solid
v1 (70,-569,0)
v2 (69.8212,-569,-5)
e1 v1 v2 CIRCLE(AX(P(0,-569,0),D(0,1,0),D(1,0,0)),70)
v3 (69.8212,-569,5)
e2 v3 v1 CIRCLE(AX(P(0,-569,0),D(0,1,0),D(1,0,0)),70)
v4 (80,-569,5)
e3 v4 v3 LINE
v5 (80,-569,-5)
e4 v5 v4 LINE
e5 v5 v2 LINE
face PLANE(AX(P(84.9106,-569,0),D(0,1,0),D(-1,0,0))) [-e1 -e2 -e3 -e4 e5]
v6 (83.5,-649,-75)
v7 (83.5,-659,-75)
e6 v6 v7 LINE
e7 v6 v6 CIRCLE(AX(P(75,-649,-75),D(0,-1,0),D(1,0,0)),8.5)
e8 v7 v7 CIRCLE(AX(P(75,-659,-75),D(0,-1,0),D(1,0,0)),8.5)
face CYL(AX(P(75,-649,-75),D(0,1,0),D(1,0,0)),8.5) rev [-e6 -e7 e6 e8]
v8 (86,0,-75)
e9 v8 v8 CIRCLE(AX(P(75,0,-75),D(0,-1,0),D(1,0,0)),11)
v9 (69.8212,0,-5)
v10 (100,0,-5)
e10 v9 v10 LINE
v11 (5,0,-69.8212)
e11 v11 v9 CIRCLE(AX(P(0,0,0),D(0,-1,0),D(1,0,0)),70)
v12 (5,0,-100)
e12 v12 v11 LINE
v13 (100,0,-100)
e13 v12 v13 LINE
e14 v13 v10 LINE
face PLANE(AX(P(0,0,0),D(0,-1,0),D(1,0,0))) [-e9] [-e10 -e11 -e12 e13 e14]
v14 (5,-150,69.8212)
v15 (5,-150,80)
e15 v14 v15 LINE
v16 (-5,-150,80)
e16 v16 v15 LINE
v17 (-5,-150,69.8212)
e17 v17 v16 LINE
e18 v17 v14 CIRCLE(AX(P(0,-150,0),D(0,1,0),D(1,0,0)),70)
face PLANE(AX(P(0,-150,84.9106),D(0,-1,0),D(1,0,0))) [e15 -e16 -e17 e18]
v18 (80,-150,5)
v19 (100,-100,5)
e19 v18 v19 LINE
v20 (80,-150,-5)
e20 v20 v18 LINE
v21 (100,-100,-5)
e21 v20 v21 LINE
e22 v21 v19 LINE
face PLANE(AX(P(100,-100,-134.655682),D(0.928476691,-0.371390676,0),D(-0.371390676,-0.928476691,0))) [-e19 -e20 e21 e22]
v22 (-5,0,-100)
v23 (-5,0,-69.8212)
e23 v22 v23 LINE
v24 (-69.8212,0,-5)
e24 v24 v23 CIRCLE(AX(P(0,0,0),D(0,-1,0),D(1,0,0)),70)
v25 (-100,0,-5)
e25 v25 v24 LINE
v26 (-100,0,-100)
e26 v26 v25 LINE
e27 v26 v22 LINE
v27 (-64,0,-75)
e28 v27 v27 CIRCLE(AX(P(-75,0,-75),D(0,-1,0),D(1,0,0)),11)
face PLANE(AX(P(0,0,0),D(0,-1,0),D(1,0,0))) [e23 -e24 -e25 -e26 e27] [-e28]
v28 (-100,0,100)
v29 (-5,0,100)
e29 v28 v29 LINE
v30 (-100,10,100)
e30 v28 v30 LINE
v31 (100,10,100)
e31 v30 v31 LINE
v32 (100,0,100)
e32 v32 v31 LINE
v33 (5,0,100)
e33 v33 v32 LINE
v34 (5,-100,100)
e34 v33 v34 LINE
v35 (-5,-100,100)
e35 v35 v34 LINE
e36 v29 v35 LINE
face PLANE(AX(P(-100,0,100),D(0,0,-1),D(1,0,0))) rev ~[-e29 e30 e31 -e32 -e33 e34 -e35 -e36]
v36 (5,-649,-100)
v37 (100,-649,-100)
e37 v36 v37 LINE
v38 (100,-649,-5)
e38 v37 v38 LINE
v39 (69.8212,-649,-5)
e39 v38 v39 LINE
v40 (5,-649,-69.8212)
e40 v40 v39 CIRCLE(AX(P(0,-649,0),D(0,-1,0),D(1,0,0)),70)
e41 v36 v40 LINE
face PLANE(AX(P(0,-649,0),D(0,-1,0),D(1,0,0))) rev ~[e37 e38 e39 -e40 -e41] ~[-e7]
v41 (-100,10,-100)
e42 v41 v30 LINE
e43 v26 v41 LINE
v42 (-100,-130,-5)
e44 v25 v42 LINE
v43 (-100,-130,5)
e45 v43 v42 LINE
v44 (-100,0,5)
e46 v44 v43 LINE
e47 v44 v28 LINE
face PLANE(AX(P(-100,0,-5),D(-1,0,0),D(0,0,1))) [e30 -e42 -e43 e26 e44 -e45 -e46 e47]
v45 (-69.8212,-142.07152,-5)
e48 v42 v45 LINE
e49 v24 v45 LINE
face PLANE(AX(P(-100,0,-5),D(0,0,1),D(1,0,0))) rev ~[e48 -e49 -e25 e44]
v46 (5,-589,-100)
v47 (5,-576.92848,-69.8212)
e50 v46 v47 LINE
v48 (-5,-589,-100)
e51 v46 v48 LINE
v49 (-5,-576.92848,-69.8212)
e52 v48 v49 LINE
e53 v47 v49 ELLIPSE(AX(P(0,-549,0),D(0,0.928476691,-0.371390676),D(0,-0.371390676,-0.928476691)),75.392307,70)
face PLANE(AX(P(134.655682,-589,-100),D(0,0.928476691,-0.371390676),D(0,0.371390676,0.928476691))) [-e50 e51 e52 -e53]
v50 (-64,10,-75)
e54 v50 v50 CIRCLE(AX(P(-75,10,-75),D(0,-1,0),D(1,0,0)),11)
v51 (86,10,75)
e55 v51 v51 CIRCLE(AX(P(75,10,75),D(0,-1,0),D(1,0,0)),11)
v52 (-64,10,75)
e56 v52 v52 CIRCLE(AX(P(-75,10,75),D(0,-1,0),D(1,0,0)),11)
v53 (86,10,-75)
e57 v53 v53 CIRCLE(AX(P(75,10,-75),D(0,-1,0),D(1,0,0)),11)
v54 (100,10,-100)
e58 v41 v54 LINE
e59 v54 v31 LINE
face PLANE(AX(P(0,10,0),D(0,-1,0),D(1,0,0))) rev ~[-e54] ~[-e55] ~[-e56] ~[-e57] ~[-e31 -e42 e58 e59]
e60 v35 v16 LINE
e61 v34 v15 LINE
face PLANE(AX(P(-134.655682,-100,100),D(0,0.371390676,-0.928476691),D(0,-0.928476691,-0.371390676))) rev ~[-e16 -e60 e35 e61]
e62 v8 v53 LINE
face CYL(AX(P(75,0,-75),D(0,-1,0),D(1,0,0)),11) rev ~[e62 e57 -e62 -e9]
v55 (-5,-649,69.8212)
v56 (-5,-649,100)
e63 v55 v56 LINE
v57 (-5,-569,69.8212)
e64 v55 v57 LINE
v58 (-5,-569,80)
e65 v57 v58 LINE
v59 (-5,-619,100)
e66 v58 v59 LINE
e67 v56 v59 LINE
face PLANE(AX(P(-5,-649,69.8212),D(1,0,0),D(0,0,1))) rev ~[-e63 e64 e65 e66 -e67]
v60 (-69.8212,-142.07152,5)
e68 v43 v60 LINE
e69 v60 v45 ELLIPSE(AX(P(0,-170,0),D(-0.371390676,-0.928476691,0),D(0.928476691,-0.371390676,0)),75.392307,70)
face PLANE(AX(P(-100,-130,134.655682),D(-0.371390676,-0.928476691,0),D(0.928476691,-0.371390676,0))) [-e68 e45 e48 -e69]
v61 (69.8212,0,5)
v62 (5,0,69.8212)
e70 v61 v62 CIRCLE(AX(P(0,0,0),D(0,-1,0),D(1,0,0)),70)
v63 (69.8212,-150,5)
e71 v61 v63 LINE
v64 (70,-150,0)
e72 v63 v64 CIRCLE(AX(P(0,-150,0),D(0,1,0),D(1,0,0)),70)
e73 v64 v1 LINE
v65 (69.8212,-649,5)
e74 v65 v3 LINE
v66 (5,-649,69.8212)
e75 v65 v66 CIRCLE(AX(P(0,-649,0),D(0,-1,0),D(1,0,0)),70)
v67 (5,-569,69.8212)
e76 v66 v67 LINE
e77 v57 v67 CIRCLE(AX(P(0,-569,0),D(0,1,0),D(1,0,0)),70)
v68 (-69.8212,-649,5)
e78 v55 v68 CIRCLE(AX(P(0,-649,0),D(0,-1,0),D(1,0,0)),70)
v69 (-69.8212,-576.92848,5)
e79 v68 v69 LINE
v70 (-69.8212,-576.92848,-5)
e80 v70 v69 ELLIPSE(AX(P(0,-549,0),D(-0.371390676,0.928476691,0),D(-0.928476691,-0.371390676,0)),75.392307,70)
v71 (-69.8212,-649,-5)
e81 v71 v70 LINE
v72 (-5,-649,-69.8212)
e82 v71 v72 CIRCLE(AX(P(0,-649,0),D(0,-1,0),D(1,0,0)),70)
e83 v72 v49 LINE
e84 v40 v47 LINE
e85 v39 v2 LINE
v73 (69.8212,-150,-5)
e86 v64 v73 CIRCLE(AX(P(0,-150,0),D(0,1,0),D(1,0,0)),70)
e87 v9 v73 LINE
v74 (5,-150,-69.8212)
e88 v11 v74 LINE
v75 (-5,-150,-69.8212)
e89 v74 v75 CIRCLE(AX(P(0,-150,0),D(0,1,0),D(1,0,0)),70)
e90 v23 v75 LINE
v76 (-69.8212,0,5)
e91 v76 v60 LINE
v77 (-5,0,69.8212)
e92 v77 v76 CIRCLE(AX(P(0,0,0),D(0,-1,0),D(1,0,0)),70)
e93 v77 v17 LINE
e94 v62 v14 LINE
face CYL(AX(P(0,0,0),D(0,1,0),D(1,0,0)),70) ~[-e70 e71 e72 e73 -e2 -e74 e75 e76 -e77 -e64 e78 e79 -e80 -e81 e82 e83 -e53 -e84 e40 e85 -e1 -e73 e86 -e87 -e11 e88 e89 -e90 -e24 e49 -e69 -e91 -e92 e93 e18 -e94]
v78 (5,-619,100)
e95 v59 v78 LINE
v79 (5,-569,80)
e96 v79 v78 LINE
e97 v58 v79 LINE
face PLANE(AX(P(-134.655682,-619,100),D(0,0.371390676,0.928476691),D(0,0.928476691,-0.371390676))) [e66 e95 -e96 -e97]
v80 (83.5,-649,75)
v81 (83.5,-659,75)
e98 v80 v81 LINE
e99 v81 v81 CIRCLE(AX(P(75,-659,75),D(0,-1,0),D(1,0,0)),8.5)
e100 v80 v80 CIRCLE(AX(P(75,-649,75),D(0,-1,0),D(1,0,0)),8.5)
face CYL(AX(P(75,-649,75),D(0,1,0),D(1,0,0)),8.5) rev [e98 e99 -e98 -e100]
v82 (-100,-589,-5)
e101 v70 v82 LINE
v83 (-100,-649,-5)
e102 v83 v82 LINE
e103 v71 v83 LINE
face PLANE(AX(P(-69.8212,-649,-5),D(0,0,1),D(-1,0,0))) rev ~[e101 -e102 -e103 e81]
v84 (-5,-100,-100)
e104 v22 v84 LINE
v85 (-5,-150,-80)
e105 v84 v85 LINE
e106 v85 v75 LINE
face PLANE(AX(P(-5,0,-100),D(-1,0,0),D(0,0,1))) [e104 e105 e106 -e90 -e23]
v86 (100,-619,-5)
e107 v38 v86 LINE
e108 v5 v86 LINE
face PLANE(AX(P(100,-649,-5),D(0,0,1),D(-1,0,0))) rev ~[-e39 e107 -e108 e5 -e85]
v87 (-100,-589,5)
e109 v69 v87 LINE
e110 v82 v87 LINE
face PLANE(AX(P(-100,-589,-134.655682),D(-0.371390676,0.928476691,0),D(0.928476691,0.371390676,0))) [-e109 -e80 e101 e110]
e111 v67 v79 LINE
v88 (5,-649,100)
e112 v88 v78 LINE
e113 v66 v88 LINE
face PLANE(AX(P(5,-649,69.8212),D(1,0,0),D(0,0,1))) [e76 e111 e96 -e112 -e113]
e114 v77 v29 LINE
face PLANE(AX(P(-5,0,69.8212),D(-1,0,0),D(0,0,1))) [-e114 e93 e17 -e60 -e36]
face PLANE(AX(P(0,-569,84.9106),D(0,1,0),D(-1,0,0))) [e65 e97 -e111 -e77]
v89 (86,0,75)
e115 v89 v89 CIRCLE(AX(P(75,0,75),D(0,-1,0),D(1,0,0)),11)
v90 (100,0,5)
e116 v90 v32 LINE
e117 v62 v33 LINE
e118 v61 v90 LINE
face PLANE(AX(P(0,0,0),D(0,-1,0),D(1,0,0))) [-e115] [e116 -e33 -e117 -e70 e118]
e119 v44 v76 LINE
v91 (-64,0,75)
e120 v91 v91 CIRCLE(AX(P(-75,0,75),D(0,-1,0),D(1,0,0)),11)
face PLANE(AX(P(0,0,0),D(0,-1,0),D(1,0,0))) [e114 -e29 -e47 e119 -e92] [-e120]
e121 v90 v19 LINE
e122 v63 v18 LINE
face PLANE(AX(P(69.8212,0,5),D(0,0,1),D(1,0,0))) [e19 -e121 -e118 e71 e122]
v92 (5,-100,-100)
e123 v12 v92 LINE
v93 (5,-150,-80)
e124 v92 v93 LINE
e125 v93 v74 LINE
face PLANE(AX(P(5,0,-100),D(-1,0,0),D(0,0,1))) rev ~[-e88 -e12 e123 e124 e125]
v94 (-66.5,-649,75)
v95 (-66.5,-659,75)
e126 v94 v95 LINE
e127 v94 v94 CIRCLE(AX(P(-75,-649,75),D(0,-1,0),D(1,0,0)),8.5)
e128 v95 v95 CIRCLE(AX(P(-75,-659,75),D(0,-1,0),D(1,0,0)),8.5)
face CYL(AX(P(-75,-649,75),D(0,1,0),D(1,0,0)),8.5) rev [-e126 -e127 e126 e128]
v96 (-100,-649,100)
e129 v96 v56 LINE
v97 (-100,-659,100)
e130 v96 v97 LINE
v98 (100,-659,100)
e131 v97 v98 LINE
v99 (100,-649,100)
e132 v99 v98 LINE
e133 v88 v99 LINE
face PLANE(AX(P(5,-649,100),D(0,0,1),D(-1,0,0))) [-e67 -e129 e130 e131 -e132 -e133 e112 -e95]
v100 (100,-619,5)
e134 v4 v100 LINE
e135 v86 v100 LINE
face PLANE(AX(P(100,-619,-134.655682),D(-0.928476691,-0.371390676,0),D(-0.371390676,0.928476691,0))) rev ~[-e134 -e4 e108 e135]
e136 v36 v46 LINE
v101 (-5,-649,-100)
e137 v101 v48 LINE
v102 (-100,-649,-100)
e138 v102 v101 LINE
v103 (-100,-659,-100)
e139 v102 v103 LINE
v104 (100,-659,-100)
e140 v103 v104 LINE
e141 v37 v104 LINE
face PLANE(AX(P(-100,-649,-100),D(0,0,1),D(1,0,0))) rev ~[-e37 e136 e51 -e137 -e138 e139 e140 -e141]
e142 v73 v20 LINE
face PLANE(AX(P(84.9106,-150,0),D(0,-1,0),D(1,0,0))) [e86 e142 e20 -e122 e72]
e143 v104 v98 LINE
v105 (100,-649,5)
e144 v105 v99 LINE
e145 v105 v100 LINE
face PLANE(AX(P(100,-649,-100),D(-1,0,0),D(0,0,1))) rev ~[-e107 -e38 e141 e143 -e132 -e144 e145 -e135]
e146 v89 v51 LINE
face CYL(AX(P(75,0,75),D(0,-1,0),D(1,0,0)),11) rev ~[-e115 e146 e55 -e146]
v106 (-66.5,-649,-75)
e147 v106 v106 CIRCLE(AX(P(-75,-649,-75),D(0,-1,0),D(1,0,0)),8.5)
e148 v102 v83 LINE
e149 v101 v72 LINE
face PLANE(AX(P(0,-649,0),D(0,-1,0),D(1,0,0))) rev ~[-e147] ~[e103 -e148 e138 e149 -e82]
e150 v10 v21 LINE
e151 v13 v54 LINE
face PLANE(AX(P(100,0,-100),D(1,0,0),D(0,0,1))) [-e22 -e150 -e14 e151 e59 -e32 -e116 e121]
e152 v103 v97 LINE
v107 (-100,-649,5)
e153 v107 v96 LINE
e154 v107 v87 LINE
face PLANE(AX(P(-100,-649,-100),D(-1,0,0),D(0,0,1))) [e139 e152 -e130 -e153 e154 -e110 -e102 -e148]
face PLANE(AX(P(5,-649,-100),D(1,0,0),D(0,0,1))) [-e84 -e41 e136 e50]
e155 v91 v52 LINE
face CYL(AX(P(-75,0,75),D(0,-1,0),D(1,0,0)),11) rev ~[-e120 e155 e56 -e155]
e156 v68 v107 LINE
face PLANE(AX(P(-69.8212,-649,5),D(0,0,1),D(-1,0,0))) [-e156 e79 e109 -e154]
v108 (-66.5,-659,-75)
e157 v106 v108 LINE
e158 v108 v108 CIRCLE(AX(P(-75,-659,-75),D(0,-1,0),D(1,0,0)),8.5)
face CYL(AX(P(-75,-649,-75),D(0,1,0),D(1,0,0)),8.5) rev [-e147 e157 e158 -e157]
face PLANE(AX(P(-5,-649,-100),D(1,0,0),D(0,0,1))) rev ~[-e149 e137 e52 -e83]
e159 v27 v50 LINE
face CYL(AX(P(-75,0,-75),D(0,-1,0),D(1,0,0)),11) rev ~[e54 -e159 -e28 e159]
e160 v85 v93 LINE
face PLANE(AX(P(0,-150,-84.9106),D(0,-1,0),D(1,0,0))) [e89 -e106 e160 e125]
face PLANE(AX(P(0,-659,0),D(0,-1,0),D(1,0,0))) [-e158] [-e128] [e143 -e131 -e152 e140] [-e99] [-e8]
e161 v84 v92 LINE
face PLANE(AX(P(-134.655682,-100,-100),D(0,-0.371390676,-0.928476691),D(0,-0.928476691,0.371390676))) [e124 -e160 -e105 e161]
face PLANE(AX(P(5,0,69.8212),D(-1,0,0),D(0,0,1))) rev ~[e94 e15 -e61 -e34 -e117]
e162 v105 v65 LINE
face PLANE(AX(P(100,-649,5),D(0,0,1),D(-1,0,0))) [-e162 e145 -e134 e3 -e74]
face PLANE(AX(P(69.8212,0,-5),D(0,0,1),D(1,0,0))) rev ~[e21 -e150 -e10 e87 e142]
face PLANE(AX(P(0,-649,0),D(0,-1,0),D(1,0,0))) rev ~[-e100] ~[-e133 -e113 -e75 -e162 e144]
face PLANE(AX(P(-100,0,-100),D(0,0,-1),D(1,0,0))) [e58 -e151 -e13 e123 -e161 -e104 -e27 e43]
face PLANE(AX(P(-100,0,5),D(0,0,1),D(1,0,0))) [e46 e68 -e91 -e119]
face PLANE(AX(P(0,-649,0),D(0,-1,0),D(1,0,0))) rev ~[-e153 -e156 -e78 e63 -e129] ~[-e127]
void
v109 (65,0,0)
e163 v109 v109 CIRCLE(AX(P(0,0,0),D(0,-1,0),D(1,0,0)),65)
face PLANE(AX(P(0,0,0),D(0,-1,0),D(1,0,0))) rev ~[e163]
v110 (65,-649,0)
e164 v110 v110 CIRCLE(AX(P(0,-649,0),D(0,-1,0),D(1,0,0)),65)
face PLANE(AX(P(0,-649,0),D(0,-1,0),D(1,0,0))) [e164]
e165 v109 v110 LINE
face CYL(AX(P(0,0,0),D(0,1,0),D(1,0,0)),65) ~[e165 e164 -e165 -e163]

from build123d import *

# Parameters (mm, degrees)
F0_R          = 70
F0_R_2        = 65
F1_DEPTH      = 649
F2_W          = 200
F2_H          = 200
F2_R          = 11
F3_DEPTH      = 10
F4_W          = 30.1787997812
F4_H          = 10
F4_W_2        = 10
F4_H_2        = 30.1787997812
F5_DEPTH      = 150
F6_T1_DEPTH   = 269.311363913
F6_T3_DEPTH   = 269.311363913
F6_T8_DEPTH   = 269.311363913
F6_S9_R       = 70
F6_T10_DEPTH  = 139
F8_W          = 200
F8_H          = 200
F8_R          = 8.5
F9_DEPTH      = 10
F10_W         = 10
F10_H         = 30.1787997812
F10_W_2       = 30.1787997812
F10_H_2       = 10
F11_DEPTH     = 80
F12_T1_DEPTH  = 269.311363913
F12_T3_DEPTH  = 269.311363913
F12_T8_DEPTH  = 269.311363913
F12_S9_R      = 70
F12_T10_DEPTH = 139
F12_T14_DEPTH = 269.311363913
F12_S15_R     = 70
F12_T16_DEPTH = 139


# Not quite as in the source:
# - a fillet or chamfer that OpenCascade refuses, or shapes differently, is made with other operations: its cross-section is extruded or revolved along the edge and cut away or added


with BuildPart() as f1:
    # F0 (on Front) → F1 (new body)
    with BuildSketch(Plane.XZ):
        Circle(F0_R)
        Circle(F0_R_2, mode=Mode.SUBTRACT)
    extrude(amount=F1_DEPTH)

    # F2 (on Front) → F3 (join)
    with BuildSketch(Plane.XZ):
        Rectangle(F2_W, F2_H)
        with Locations((-75, -75)):
            Circle(F2_R, mode=Mode.SUBTRACT)
        with Locations((75, -75)):
            Circle(F2_R, mode=Mode.SUBTRACT)
        with Locations((-75, 75)):
            Circle(F2_R, mode=Mode.SUBTRACT)
        with Locations((75, 75)):
            Circle(F2_R, mode=Mode.SUBTRACT)
    extrude(amount=-F3_DEPTH)

    # F4 (on Front) → F5 (join)
    with BuildSketch(Plane.XZ):
        with Locations((-84.9106001094, 0)):
            Rectangle(F4_W, F4_H)
        with Locations((0, 84.9106001094)):
            Rectangle(F4_W_2, F4_H_2)
        with Locations((84.9106001094, 0)):
            Rectangle(F4_W, F4_H)
        with Locations((0, -84.9106001094)):
            Rectangle(F4_W_2, F4_H_2)
    extrude(amount=F5_DEPTH)

    # F6: chamfer of 50 x 20 on 4 edges, made by hand

    # F6_s2 → F6_t1 (cut)
    with BuildSketch(Plane.YZ.offset(-134.6556819565)):
        Polygon((-100, 100), (-150, 80), (-150, 100), align=None)
        Polygon((-100, -100), (-150, -80), (-150, -100), align=None)
    extrude(amount=F6_T1_DEPTH, mode=Mode.SUBTRACT)

    # F6_s4 → F6_t3 (cut)
    with BuildSketch(Plane.XY.offset(-134.6556819565)):
        Polygon((100, -100), (80, -150), (100, -150), align=None)
    extrude(amount=F6_T3_DEPTH, mode=Mode.SUBTRACT)


with BuildPart() as f6_tool6:
    # F6_s7 → F6_t8 (new body)
    with BuildSketch(Plane.XY.offset(134.6556819565)):
        Polygon((-100, -130), (-50, -150), (-100, -150), align=None)
    extrude(amount=-F6_T8_DEPTH)

    # F6_s9 → F6_t10 (cut, symmetric)
    with BuildSketch(Plane.XZ.offset(140)):
        Circle(F6_S9_R)
    extrude(amount=F6_T10_DEPTH, both=True, mode=Mode.SUBTRACT)


with BuildPart() as f1_1:
    add(f1.part)

    # F6_t5: cut F6_tool6
    add(f6_tool6.part, mode=Mode.SUBTRACT)

    # F8 (on offset) → F9 (join)
    with BuildSketch(Plane.XZ.offset(649)):
        Rectangle(F8_W, F8_H)
        with Locations((-75, -75)):
            Circle(F8_R, mode=Mode.SUBTRACT)
        with Locations((75, -75)):
            Circle(F8_R, mode=Mode.SUBTRACT)
        with Locations((-75, 75)):
            Circle(F8_R, mode=Mode.SUBTRACT)
        with Locations((75, 75)):
            Circle(F8_R, mode=Mode.SUBTRACT)
    extrude(amount=F9_DEPTH)

    # F10 (on face) → F11 (join)
    with BuildSketch(Plane(origin=(0, -649, 0), x_dir=(-1, 0, 0), z_dir=(0, 1, 0))):
        with Locations((0, 84.9106001094)):
            Rectangle(F10_W, F10_H)
        with Locations((84.9106001094, 0)):
            Rectangle(F10_W_2, F10_H_2)
        with Locations((0, -84.9106001094)):
            Rectangle(F10_W, F10_H)
        with Locations((-84.9106001094, 0)):
            Rectangle(F10_W_2, F10_H_2)
    extrude(amount=F11_DEPTH)

    # F12: chamfer of 20 x 50 on 4 edges, made by hand

    # F12_s2 → F12_t1 (cut)
    with BuildSketch(Plane.YZ.offset(-134.6556819565)):
        Polygon((-619, 100), (-569, 80), (-569, 100), align=None)
    extrude(amount=F12_T1_DEPTH, mode=Mode.SUBTRACT)

    # F12_s4 → F12_t3 (cut)
    with BuildSketch(Plane.XY.offset(-134.6556819565)):
        Polygon((100, -619), (80, -569), (100, -569), align=None)
    extrude(amount=F12_T3_DEPTH, mode=Mode.SUBTRACT)


with BuildPart() as f12_tool6:
    # F12_s7 → F12_t8 (new body)
    with BuildSketch(Plane.XY.offset(-134.6556819565)):
        Polygon((-100, -589), (-50, -569), (-100, -569), align=None)
    extrude(amount=F12_T8_DEPTH)

    # F12_s9 → F12_t10 (cut, symmetric)
    with BuildSketch(Plane.XZ.offset(579)):
        Circle(F12_S9_R)
    extrude(amount=F12_T10_DEPTH, both=True, mode=Mode.SUBTRACT)


with BuildPart() as f1_2:
    add(f1_1.part)

    # F12_t5: cut F12_tool6
    add(f12_tool6.part, mode=Mode.SUBTRACT)


with BuildPart() as f12_tool12:
    # F12_s13 → F12_t14 (new body)
    with BuildSketch(Plane.YZ.offset(134.6556819565)):
        Polygon((-589, -100), (-569, -50), (-569, -100), align=None)
    extrude(amount=-F12_T14_DEPTH)

    # F12_s15 → F12_t16 (cut, symmetric)
    with BuildSketch(Plane.XZ.offset(579)):
        Circle(F12_S15_R)
    extrude(amount=F12_T16_DEPTH, both=True, mode=Mode.SUBTRACT)


with BuildPart() as f1_3:
    add(f1_2.part)

    # F12_t11: cut F12_tool12
    add(f12_tool12.part, mode=Mode.SUBTRACT)


solid = f1_3.part
